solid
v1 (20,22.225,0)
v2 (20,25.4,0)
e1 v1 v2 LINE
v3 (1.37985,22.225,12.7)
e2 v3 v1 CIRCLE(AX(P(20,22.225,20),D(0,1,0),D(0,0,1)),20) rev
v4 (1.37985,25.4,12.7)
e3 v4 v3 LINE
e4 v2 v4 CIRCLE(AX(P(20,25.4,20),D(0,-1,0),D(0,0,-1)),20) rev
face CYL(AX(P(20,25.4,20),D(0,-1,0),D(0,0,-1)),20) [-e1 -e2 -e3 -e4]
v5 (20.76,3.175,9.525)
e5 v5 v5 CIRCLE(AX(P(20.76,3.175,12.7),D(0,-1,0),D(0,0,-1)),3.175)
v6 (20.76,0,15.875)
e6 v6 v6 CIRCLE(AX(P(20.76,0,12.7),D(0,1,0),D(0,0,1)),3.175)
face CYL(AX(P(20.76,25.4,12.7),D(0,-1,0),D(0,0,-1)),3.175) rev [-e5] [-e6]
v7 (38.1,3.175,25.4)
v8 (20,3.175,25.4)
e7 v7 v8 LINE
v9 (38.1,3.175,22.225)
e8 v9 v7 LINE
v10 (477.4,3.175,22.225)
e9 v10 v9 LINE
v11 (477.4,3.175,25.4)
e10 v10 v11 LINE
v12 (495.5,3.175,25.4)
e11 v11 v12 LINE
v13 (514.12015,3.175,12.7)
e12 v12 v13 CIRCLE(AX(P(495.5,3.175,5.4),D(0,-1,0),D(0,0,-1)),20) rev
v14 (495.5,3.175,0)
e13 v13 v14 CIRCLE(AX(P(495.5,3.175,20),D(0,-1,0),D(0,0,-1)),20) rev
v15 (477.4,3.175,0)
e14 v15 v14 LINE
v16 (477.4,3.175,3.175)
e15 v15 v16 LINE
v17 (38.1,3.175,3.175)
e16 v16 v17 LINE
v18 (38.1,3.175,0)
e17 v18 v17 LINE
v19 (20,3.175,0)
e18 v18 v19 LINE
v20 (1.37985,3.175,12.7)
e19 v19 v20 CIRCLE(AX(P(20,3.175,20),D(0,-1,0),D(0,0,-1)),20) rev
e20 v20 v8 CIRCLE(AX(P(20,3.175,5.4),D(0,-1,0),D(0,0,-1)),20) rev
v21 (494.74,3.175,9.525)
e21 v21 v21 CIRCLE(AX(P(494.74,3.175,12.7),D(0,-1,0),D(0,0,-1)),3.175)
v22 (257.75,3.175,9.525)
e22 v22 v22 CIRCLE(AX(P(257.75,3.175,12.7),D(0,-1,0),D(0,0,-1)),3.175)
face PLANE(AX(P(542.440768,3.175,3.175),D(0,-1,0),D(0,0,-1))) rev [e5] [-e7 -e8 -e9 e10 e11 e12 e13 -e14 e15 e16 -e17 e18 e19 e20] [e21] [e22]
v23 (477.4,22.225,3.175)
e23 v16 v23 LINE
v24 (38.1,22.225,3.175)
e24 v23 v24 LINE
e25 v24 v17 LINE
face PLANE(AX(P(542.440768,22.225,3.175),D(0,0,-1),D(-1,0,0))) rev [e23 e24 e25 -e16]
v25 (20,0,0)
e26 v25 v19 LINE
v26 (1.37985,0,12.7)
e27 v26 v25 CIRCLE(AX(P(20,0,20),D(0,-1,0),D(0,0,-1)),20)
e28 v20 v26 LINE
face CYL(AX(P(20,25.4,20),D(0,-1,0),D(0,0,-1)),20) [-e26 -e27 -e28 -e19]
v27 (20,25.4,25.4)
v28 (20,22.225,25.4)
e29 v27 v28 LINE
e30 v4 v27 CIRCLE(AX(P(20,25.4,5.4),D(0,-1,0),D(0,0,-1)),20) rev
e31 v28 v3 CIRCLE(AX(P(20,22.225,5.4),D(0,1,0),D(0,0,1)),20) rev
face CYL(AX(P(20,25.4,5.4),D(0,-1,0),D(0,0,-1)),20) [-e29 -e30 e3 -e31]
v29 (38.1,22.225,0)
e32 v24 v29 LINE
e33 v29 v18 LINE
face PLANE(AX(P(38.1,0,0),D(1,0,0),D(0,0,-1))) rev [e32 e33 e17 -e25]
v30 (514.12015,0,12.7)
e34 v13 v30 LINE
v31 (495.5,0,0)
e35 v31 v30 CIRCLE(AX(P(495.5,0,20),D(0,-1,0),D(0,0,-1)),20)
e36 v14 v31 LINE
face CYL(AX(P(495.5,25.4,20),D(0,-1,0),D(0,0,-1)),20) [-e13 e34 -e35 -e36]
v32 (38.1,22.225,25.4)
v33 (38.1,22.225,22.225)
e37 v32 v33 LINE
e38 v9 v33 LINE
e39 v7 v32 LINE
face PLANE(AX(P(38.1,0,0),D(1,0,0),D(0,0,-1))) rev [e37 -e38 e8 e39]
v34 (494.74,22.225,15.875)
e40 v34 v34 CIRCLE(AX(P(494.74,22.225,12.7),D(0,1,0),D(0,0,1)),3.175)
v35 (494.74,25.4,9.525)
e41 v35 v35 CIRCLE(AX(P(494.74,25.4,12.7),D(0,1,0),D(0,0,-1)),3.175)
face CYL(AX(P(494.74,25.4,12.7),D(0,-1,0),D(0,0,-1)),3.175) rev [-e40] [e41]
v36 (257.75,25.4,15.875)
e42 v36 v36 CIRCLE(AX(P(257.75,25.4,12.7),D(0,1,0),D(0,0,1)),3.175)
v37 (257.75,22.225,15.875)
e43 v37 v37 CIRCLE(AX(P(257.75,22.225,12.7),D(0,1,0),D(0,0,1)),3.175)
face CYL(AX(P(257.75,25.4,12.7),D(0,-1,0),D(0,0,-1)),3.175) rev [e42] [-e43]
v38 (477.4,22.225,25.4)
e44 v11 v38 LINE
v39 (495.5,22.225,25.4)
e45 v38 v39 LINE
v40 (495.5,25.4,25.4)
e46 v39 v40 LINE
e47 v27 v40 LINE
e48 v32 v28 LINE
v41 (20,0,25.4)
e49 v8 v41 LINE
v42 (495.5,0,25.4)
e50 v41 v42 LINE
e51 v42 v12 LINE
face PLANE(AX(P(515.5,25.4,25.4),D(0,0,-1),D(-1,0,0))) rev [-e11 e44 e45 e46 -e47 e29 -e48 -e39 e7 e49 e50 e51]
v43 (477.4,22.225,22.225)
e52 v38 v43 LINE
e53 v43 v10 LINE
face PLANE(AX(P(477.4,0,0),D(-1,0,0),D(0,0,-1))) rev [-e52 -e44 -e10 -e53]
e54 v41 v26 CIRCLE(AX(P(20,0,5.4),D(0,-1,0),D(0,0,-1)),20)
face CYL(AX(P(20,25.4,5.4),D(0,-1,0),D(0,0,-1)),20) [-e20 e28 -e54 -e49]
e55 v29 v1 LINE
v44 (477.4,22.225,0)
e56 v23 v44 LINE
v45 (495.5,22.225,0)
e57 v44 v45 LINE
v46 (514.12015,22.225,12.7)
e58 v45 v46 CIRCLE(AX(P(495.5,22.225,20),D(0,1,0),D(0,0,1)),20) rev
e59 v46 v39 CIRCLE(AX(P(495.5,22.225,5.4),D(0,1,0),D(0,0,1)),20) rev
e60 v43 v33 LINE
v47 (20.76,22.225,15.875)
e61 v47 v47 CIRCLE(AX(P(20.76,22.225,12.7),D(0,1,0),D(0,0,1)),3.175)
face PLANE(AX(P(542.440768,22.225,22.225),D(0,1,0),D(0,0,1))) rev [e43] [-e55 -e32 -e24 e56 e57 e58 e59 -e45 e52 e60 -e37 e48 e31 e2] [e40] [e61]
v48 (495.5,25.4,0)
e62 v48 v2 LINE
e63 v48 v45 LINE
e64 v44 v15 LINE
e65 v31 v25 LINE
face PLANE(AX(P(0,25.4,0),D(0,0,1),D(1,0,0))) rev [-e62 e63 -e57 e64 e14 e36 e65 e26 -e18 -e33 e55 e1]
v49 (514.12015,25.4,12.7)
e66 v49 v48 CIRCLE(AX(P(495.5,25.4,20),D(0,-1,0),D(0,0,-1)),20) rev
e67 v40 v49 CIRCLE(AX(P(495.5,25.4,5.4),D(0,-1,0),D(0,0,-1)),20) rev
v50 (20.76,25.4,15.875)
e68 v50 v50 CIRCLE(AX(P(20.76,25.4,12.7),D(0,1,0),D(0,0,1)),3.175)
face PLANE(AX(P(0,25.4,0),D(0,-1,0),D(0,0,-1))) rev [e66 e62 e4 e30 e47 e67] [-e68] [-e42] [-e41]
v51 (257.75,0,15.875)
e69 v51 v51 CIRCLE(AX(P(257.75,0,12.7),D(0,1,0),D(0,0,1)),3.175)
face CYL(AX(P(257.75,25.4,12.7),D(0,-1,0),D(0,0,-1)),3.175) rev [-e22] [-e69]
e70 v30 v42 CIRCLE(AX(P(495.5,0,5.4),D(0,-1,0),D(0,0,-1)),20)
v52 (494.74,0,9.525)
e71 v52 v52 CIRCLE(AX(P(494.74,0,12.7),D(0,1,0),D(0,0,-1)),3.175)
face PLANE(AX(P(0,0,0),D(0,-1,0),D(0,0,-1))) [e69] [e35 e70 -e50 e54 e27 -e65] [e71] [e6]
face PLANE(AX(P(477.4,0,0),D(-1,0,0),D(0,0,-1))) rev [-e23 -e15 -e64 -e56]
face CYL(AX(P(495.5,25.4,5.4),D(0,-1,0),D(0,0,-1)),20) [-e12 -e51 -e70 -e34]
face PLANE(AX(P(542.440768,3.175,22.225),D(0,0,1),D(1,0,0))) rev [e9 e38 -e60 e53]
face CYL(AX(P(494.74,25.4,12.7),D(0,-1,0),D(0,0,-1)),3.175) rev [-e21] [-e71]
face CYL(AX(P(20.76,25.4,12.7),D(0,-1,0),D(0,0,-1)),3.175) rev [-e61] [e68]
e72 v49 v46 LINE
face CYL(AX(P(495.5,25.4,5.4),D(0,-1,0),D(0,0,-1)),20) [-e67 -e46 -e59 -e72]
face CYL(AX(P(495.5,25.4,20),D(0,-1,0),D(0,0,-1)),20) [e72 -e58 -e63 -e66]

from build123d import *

# Parameters (mm, degrees)
SKETCH1_W           = 515.5
SKETCH1_H           = 25.4
SKETCH1_R           = 3.175
BOSS_EXTRUDE1_DEPTH = 25.4
CUT_EXTRUDE1_REACH  = 518.75
SKETCH2_W           = 19.05
SKETCH2_H           = 19.05
SKETCH4_W           = 25.4
SKETCH4_H           = 19.05
CUT_EXTRUDE2_DEPTH  = 38.1
FILLET1_R           = 20


with BuildPart() as part:
    # Sketch1 → Boss-Extrude1 (new body)
    with BuildSketch(Plane(origin=(0, 0, 0), x_dir=(1, 0, 0), z_dir=(0, 1, 0))):
        with Locations((257.75, -12.7)):
            Rectangle(SKETCH1_W, SKETCH1_H)
        with Locations(Location((257.75, -12.7, 0), (0, 0, 270))):
            Circle(SKETCH1_R, mode=Mode.SUBTRACT)
        with Locations(Location((20.76, -12.7, 0), (0, 0, 270))):
            Circle(SKETCH1_R, mode=Mode.SUBTRACT)
        with Locations(Location((494.74, -12.7, 0), (0, 0, 90))):
            Circle(SKETCH1_R, mode=Mode.SUBTRACT)
    extrude(amount=BOSS_EXTRUDE1_DEPTH)

    # Cut-Extrude1: up to this face of the body (flat: up to its plane)
    cut_extrude1_end = Plane(part.part.faces().sort_by_distance((515.5, 12.7, 12.7))[0])
    # Sketch2 → Cut-Extrude1 (cut, up to the picked face)
    with BuildSketch(Plane.ZY, mode=Mode.PRIVATE) as cut_extrude1_sk1:
        with Locations((12.7, 12.7)):
            Rectangle(SKETCH2_W, SKETCH2_H)
    cut_extrude1_tool1 = split(extrude(cut_extrude1_sk1.sketch, amount=-CUT_EXTRUDE1_REACH, mode=Mode.PRIVATE), bisect_by=cut_extrude1_end, keep=Keep.BOTH, mode=Mode.PRIVATE)
    add(cut_extrude1_tool1.solids().sort_by(Axis((0, 12.7, 12.7), (1, 0, 0)))[0], mode=Mode.SUBTRACT)

    # Sketch4 → Cut-Extrude2 (cut)
    with BuildSketch(Plane.ZY):
        with Locations((12.7, 12.7)):
            Rectangle(SKETCH4_W, SKETCH4_H)
    cut_extrude2 = extrude(amount=-CUT_EXTRUDE2_DEPTH, mode=Mode.SUBTRACT)

    # Mirror1: Cut-Extrude2 across plane
    add(cut_extrude2.mirror(Plane.ZY.offset(-257.75)), mode=Mode.SUBTRACT)

    # Fillet1
    # the kernel refuses this fillet: 20 mm, written as the material it takes off along each edge
    with BuildSketch(Plane(origin=(515.5, -50, 0), x_dir=(-1, 0, 0), z_dir=(0, 1, 0)), Plane(origin=(515.5, -27.775, 0), x_dir=(-1, 0, 0), z_dir=(0, 1, 0)), Plane(origin=(0, -27.775, 25.4), x_dir=(1, 0, 0), z_dir=(0, 1, 0))) as fillet1_piece_1:
        with BuildLine():
            CenterArc((FILLET1_R, FILLET1_R), FILLET1_R, 180, 90)
            Line((0, FILLET1_R), (0, 0))
            Line((0, 0), (FILLET1_R, 0))
        make_face()
    extrude(amount=103.175, mode=Mode.SUBTRACT)
    with BuildSketch(Plane(origin=(515.5, -50, 25.4), x_dir=(-1, 0, 0), z_dir=(0, 1, 0)), Plane(origin=(515.5, -27.775, 25.4), x_dir=(-1, 0, 0), z_dir=(0, 1, 0)), Plane(origin=(0, -50, 25.4), x_dir=(0, 0, -1), z_dir=(0, 1, 0)), Plane(origin=(0, -50, 0), x_dir=(1, 0, 0), z_dir=(0, 1, 0)), Plane(origin=(0, -27.775, 0), x_dir=(1, 0, 0), z_dir=(0, 1, 0))) as fillet1_piece_2:
        with BuildLine():
            CenterArc((FILLET1_R, -FILLET1_R), FILLET1_R, 90, 90)
            Line((0, -FILLET1_R), (0, 0))
            Line((0, 0), (FILLET1_R, 0))
        make_face()
    extrude(amount=103.175, mode=Mode.SUBTRACT)


solid = part.part
